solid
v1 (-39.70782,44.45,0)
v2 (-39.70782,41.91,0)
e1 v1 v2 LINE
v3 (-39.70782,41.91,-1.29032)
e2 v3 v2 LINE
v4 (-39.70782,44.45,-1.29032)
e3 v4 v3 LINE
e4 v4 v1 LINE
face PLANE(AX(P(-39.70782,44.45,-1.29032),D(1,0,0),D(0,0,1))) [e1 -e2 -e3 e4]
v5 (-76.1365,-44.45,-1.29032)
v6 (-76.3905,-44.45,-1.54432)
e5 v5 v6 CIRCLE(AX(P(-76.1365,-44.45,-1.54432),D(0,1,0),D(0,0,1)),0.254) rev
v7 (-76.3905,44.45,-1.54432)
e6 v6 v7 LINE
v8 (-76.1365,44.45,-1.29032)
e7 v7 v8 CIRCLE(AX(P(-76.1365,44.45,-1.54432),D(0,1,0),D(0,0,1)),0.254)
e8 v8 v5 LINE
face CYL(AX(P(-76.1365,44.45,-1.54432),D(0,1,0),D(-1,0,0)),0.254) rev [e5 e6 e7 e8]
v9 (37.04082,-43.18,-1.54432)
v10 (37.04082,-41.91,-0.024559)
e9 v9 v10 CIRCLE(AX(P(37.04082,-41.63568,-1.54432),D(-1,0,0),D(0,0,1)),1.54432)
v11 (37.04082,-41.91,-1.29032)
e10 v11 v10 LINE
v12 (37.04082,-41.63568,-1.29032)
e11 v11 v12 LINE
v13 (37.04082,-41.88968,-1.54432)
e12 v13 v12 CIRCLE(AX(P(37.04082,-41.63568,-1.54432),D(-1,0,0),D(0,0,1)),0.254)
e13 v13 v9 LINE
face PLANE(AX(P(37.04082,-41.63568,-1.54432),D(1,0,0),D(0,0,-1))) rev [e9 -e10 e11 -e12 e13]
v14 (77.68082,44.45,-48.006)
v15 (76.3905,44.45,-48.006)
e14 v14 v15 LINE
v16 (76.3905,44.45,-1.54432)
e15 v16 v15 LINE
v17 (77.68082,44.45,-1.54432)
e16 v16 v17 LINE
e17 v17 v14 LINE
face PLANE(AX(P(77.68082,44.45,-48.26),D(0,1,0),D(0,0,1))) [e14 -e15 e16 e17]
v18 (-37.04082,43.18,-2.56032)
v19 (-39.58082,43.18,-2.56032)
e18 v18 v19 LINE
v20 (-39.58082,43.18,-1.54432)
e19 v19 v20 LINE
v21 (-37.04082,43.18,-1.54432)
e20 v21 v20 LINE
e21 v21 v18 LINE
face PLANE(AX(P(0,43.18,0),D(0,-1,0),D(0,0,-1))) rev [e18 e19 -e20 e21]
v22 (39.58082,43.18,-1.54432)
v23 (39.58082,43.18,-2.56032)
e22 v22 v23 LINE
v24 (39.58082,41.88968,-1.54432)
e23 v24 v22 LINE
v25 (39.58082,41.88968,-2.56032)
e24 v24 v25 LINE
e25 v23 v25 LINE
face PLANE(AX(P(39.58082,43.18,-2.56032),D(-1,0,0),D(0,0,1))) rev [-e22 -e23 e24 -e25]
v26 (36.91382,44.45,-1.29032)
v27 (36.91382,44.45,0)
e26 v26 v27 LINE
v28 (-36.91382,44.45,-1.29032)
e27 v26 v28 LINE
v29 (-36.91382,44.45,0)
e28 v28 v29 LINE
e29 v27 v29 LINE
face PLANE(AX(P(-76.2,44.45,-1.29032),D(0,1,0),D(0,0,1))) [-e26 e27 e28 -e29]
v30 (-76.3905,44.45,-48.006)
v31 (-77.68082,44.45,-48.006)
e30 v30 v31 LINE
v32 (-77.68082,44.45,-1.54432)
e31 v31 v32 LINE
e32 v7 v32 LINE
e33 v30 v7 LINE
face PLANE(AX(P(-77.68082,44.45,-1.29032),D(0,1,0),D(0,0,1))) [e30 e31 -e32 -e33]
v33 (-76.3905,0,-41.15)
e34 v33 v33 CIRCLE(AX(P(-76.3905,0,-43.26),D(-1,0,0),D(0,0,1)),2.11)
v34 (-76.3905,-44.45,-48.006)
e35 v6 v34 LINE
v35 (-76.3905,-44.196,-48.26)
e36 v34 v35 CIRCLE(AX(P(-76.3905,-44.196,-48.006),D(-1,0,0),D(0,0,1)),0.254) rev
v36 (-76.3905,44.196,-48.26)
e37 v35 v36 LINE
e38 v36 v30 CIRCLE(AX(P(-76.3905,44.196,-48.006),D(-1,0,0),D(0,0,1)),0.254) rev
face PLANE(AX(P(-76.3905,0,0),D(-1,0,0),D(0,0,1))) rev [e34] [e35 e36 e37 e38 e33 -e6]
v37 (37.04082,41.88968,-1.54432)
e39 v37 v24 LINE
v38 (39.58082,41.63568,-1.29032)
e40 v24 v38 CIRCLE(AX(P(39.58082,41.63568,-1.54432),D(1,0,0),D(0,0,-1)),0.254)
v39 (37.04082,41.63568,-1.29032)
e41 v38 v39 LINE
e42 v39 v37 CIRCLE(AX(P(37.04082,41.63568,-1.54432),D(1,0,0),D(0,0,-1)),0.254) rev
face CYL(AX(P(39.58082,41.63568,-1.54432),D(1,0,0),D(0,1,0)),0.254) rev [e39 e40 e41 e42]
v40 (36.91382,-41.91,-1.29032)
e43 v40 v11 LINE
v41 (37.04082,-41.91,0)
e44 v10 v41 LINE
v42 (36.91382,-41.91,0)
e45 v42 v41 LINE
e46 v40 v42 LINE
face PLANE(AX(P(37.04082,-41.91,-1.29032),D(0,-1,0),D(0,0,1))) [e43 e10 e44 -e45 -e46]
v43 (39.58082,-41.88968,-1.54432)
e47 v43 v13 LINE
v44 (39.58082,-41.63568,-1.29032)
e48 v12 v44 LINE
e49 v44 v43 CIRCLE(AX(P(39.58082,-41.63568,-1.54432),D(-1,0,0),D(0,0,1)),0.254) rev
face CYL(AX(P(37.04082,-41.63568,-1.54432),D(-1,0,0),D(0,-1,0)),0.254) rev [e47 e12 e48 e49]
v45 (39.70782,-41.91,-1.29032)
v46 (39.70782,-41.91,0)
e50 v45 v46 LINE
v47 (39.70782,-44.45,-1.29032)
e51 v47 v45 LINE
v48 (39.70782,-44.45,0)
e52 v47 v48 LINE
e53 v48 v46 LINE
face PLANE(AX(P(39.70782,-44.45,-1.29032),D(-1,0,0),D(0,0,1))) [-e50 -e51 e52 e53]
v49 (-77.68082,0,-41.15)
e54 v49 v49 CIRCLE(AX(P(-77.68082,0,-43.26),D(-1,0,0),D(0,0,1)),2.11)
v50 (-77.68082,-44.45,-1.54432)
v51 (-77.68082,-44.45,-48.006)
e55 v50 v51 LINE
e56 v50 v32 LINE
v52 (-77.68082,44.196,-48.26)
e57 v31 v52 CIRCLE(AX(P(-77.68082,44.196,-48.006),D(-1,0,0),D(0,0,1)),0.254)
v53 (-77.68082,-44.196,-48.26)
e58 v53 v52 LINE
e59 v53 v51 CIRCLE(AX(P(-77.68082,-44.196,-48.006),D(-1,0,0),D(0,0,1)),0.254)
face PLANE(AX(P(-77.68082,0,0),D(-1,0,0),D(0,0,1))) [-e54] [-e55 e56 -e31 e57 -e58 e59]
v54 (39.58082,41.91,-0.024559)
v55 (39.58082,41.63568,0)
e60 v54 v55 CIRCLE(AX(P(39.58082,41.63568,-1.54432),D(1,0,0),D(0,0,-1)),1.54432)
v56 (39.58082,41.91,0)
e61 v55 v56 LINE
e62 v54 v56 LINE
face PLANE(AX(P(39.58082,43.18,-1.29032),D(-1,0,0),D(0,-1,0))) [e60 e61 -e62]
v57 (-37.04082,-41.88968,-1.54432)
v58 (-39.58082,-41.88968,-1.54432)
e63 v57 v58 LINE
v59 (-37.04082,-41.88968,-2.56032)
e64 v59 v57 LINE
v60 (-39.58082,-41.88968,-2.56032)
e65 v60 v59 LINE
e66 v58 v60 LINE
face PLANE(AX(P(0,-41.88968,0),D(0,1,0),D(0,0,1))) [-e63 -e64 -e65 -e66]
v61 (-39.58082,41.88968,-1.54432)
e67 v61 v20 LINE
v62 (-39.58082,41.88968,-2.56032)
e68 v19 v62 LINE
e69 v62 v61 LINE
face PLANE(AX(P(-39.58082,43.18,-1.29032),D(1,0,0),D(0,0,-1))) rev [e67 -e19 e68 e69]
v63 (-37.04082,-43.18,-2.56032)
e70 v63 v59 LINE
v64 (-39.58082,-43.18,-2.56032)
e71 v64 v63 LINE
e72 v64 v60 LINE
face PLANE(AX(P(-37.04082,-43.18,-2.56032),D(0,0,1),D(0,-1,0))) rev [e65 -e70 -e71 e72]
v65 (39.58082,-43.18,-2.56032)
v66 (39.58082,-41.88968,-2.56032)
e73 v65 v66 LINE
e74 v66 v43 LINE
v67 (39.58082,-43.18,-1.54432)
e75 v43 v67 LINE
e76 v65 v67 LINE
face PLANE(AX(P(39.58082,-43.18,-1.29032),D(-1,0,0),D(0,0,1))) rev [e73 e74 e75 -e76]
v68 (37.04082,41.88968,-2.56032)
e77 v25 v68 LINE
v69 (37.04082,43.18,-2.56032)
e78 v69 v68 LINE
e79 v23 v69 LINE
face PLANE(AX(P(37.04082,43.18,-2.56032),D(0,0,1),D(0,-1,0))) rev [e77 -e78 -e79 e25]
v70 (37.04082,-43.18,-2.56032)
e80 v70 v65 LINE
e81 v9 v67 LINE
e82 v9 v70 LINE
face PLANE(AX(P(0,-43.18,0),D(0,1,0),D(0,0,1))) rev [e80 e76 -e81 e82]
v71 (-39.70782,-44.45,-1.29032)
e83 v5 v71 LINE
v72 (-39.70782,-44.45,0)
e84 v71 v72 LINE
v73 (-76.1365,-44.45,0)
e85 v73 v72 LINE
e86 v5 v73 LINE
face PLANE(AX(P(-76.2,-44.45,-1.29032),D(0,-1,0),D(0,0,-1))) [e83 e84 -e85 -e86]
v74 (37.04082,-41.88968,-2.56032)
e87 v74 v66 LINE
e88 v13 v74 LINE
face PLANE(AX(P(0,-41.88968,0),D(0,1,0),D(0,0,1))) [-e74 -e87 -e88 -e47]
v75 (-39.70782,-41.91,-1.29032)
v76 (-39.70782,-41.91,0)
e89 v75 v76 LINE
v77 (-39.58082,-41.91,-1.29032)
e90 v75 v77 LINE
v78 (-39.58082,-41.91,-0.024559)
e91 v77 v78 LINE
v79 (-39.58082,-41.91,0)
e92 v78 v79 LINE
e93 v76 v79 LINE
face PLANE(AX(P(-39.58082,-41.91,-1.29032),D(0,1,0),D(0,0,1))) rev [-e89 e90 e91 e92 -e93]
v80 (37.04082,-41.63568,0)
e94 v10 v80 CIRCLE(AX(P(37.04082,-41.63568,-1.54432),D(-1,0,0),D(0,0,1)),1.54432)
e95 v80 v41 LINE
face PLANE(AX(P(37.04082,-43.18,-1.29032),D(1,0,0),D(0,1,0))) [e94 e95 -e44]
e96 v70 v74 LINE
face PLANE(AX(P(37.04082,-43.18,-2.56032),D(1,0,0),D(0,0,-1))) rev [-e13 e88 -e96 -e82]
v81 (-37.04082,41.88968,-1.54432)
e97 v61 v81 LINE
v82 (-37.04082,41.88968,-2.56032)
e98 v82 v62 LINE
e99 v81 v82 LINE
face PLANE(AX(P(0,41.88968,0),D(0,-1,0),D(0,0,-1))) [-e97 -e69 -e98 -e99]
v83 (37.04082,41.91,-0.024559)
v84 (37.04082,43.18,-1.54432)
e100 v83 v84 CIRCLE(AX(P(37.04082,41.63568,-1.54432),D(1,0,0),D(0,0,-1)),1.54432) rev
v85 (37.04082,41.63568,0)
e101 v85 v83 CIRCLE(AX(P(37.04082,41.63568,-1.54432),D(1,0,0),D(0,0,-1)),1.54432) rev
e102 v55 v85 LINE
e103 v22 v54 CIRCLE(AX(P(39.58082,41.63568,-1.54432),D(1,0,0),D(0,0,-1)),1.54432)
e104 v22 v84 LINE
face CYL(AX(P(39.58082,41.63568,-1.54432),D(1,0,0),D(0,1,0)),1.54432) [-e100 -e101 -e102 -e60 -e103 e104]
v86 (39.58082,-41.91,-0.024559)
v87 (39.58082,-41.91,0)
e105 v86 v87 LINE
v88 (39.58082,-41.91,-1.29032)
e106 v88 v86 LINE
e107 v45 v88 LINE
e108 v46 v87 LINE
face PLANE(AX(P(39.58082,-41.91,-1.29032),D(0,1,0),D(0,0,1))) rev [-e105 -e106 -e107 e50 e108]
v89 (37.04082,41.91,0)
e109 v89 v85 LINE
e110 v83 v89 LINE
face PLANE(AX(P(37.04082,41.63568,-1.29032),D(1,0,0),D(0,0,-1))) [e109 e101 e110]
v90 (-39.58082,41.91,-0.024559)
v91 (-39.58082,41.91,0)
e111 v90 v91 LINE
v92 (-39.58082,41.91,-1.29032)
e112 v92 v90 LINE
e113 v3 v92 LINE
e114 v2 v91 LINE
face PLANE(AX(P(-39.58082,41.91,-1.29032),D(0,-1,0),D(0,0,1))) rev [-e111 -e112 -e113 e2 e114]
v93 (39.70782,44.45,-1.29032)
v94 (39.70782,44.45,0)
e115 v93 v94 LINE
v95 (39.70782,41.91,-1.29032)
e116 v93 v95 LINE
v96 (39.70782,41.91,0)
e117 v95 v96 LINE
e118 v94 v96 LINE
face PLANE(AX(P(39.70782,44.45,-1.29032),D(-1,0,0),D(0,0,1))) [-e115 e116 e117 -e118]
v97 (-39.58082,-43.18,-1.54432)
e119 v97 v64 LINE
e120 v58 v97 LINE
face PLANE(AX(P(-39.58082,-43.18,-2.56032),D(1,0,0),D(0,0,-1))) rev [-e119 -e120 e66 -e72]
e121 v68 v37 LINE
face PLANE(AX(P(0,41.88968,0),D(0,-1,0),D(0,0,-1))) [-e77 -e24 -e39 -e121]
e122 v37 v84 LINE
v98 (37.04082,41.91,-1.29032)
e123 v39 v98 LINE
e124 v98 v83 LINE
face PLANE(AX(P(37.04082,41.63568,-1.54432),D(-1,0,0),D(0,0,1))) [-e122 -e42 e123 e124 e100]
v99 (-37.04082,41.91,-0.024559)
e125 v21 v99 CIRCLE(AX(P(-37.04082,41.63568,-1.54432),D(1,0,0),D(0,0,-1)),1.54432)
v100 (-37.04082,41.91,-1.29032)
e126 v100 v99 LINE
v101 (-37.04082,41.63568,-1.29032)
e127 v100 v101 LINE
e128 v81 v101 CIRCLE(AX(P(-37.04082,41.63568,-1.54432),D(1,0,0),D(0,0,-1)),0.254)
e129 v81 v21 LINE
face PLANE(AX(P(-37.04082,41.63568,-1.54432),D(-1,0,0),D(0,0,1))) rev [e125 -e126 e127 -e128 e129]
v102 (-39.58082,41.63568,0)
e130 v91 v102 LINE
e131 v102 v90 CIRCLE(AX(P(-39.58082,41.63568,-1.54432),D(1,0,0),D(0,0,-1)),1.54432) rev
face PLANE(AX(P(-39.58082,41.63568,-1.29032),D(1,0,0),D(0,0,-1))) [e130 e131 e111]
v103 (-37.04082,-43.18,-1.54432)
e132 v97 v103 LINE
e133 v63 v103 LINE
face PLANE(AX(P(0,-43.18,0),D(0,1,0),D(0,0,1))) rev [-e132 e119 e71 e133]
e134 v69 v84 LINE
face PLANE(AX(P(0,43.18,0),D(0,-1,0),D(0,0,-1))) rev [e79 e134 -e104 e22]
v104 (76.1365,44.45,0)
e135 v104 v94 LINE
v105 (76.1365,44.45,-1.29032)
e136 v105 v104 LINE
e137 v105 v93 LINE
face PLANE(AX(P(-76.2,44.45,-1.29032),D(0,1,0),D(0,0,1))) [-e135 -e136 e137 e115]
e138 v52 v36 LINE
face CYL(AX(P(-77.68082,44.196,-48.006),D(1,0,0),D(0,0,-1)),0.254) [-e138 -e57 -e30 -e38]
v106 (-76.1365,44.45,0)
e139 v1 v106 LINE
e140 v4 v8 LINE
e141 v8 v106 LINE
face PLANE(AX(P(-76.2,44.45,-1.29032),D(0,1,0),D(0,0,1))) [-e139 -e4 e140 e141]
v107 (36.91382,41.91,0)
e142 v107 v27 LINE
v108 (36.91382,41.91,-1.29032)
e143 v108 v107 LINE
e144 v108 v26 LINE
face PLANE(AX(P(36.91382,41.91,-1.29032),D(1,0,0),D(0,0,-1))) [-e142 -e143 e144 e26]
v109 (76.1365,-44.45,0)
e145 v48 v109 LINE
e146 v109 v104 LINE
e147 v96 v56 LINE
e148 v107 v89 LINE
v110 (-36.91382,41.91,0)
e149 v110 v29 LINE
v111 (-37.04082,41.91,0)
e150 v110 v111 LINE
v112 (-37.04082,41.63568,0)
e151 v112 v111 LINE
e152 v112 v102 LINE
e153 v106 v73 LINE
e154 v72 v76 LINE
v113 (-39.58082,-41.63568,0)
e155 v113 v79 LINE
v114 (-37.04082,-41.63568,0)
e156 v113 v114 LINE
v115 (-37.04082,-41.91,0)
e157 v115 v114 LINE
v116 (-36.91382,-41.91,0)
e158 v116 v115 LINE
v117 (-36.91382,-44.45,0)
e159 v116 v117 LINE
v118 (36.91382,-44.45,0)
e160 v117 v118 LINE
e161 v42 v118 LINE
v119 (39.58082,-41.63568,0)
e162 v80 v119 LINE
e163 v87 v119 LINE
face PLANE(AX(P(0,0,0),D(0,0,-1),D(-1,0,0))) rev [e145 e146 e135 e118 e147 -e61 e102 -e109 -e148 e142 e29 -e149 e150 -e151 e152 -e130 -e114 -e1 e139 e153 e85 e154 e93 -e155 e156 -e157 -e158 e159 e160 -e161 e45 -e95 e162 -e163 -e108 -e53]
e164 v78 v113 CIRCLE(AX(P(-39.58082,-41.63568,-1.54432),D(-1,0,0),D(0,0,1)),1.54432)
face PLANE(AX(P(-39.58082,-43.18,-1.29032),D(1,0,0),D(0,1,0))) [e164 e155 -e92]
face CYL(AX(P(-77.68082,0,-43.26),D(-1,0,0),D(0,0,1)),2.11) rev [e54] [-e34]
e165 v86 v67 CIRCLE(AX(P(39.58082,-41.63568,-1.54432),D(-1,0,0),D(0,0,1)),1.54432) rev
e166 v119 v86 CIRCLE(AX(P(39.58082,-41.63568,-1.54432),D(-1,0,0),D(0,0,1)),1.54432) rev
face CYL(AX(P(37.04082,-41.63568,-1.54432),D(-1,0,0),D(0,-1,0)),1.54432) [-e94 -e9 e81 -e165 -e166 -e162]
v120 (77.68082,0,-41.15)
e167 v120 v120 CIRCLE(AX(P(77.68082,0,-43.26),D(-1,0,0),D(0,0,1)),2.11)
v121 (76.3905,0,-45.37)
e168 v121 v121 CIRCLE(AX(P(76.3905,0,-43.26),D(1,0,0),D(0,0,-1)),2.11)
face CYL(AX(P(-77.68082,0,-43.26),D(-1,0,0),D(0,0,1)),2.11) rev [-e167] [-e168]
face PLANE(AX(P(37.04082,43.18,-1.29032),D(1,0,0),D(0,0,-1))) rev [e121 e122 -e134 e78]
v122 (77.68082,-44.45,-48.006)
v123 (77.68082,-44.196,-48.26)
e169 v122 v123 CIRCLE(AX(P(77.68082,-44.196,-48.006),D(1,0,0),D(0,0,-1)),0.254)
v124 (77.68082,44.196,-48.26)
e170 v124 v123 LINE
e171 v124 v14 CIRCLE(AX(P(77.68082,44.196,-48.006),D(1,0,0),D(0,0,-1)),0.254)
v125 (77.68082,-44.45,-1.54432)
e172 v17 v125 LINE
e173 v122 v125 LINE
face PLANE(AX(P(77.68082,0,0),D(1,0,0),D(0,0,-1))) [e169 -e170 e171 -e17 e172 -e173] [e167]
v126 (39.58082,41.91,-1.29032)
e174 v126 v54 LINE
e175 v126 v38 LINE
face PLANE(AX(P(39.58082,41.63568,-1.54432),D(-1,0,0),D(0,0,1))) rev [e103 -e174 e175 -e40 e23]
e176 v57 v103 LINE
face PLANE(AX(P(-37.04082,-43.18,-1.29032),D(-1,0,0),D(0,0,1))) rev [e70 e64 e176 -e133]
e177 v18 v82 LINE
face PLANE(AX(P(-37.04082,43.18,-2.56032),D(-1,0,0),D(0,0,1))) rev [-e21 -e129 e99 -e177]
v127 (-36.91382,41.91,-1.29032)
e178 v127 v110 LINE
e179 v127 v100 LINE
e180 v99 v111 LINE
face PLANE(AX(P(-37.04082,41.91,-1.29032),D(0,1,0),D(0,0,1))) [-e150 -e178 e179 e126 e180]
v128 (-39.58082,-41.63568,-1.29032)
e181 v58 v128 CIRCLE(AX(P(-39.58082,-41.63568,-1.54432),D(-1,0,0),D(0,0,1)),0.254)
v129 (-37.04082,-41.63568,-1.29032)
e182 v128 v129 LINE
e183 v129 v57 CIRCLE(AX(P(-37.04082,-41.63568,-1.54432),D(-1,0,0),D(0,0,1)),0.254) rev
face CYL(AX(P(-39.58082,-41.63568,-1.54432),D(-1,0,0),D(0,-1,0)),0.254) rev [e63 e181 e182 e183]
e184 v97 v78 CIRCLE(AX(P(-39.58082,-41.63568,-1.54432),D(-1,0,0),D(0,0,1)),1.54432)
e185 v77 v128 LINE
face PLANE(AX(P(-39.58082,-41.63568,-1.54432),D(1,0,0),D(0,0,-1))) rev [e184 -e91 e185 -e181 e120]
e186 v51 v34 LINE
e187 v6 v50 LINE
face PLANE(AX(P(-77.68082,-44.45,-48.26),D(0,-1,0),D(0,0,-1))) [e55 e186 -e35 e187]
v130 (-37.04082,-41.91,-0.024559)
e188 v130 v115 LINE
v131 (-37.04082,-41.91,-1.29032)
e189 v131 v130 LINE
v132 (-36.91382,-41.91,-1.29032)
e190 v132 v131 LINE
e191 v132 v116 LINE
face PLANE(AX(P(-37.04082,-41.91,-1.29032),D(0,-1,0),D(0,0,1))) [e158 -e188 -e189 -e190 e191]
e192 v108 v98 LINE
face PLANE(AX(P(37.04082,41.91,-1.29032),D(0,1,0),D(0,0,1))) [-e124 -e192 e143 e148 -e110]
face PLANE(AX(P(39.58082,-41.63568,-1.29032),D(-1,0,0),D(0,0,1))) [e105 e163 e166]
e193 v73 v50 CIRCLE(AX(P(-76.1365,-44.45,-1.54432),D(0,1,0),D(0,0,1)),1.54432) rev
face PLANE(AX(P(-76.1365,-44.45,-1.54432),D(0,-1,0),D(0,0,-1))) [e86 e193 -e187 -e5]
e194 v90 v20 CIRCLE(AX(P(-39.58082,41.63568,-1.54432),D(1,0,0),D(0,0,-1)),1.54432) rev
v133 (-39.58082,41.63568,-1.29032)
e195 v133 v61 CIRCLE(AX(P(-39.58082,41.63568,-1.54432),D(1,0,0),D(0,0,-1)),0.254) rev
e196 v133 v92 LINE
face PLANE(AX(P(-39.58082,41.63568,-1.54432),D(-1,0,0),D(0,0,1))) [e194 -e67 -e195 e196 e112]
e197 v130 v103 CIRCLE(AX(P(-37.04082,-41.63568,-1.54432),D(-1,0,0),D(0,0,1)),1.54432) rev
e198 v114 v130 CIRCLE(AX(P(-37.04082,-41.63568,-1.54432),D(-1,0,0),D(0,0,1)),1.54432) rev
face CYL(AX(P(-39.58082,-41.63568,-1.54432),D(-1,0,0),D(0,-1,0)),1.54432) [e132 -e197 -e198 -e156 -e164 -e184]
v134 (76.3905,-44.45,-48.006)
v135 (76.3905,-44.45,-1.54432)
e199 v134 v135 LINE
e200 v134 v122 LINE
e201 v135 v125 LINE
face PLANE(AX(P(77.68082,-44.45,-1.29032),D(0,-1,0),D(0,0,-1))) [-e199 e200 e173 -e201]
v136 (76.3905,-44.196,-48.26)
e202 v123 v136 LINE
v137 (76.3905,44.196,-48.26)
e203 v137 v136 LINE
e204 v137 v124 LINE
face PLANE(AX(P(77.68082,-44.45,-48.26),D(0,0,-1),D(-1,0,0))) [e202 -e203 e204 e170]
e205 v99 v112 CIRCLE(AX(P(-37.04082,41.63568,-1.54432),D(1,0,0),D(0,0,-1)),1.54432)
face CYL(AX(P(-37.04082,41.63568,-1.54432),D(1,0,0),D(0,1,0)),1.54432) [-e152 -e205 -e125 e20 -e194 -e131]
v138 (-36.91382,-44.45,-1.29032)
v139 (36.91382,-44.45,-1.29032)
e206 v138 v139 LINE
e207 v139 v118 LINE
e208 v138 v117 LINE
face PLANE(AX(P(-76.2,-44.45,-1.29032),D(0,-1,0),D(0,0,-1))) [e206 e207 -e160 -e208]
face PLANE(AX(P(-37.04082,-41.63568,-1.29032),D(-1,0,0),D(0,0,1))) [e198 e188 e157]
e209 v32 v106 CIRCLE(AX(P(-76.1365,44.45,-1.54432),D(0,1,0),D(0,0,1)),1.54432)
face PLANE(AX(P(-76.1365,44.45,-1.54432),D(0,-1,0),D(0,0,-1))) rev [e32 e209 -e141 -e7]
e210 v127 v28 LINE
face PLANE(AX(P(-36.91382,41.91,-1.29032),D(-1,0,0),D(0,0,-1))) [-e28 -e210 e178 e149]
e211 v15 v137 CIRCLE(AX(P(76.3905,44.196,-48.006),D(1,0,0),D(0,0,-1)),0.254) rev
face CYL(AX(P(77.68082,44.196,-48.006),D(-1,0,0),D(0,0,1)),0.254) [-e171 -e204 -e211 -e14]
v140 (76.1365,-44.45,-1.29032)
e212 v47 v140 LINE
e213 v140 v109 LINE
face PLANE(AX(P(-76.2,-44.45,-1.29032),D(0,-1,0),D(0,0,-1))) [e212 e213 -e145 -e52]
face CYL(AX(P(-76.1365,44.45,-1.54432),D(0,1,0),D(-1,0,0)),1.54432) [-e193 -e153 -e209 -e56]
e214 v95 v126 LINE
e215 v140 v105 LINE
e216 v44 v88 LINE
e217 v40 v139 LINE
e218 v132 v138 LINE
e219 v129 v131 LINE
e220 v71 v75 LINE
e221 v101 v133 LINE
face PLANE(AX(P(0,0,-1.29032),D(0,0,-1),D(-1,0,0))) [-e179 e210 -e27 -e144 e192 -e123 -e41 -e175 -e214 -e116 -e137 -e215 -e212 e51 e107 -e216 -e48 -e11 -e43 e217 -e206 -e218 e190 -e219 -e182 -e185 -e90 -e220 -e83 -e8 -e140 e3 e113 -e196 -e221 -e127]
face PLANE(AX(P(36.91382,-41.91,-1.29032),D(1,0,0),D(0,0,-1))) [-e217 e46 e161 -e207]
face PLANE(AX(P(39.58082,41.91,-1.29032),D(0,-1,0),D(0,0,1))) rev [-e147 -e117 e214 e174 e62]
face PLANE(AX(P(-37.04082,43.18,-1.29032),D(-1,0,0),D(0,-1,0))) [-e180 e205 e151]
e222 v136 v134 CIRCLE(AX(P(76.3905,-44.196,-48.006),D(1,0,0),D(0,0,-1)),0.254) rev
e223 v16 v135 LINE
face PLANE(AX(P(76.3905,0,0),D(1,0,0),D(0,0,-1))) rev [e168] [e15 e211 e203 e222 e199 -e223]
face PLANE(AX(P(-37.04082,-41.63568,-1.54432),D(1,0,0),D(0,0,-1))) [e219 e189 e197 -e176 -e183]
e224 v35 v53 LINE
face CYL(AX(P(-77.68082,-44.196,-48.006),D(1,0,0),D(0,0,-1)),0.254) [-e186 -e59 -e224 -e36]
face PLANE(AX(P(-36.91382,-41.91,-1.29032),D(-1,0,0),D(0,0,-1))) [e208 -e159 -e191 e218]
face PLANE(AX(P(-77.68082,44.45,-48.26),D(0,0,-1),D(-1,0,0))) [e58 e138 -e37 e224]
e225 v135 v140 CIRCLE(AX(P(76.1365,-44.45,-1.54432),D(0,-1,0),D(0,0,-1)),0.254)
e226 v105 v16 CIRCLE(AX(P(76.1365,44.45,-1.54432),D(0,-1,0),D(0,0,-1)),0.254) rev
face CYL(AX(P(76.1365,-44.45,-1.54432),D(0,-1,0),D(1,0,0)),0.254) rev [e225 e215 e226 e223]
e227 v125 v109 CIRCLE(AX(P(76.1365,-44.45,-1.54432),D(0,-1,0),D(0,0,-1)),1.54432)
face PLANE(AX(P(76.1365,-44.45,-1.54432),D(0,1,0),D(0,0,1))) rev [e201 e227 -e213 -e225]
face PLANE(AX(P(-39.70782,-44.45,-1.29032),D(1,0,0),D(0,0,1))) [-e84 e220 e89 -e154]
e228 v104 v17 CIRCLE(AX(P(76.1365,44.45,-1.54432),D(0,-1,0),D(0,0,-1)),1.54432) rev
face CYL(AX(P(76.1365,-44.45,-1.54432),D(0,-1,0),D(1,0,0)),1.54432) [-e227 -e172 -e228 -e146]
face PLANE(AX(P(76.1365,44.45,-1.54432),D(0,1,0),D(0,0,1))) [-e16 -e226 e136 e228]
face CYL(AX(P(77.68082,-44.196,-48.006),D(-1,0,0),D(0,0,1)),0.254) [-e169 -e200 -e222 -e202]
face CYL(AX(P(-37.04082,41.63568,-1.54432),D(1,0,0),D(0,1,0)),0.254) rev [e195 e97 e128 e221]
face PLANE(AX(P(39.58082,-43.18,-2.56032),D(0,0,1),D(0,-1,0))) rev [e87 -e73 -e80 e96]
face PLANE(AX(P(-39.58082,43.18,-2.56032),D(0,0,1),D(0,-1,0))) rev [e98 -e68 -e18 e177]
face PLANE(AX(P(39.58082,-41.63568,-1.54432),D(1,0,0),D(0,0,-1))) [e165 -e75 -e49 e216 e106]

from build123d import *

# Parameters (mm, degrees)
SKETCH1_W                         = 152.4
SKETCH1_H                         = 88.9
BASE_FLANGE1_DEPTH                = 1.29032
EDGE_FLANGE1_STRIP_W              = 5.85978
EDGE_FLANGE1_STRIP_H              = 1.29032
EDGE_FLANGE1_STRIP_CUT_DEPTH      = 88.9
EDGE_FLANGE1_STRIP_2_W            = 5.85978
EDGE_FLANGE1_STRIP_2_H            = 1.29032
EDGE_FLANGE1_STRIP_CUT_2_DEPTH    = 88.9
EDGE_FLANGE1_DEPTH                = 88.9
EDGE_FLANGE1_BEND_DEPTH           = 88.9
F_4_22MM_HOLE_FOR_M3_CLINCH_NUT_D = 4.22
BREAK_CORNER1_START               = -77.68082
BREAK_CORNER1_DEPTH               = 155.36164
CUT_THICKEN1_START                = 41.91
CUT_THICKEN1_OUTLINE_W            = 0.127
CUT_THICKEN1_OUTLINE_H            = 1.29032
CUT_THICKEN1_DEPTH                = 2.54
CUT_THICKEN2_START                = 41.91
CUT_THICKEN2_OUTLINE_W            = 0.127
CUT_THICKEN2_OUTLINE_H            = 1.29032
CUT_THICKEN2_DEPTH                = 2.54
MIRROR7_START                     = 41.91
MIRROR7_COPY_1_SKETCH_W           = 0.127
MIRROR7_COPY_1_SKETCH_H           = 1.29032
MIRROR7_COPY_1_DEPTH              = 2.54
MIRROR7_COPY_2_SKETCH_W           = 0.127
MIRROR7_COPY_2_SKETCH_H           = 1.29032
MIRROR7_COPY_2_DEPTH              = 2.54
MOVE_FACE1_BY                     = 1.27
MOVE_FACE1_2_BY                   = 1.27
MOVE_FACE1_3_BY                   = 1.27
MOVE_FACE1_4_BY                   = 1.27
EDGE_FLANGE2_STRIP_W              = 5.66928
EDGE_FLANGE2_STRIP_H              = 1.29032
EDGE_FLANGE2_STRIP_CUT_DEPTH      = 2.54
EDGE_FLANGE2_STRIP_2_W            = 5.66928
EDGE_FLANGE2_STRIP_2_H            = 1.29032
EDGE_FLANGE2_STRIP_CUT_2_DEPTH    = 2.54
EDGE_FLANGE2_STRIP_3_W            = 5.66928
EDGE_FLANGE2_STRIP_3_H            = 1.29032
EDGE_FLANGE2_STRIP_CUT_3_DEPTH    = 2.54
EDGE_FLANGE2_STRIP_4_W            = 5.66928
EDGE_FLANGE2_STRIP_4_H            = 1.29032
EDGE_FLANGE2_STRIP_CUT_4_DEPTH    = 2.54
EDGE_FLANGE2_DEPTH                = 2.54
EDGE_FLANGE2_BEND_DEPTH           = 2.54
EDGE_FLANGE2_BEND_2_DEPTH         = 2.54
EDGE_FLANGE2_BEND_3_DEPTH         = 2.54


# Read off the part's stored shape, not the designer's step: Break-Corner1, Cut-Thicken1, Cut-Thicken2
# Sheet-metal steps are written as plain solids
with BuildPart() as part:
    # Sketch1 → Base-Flange1 (new body)
    with BuildSketch(Plane.XY):
        Rectangle(SKETCH1_W, SKETCH1_H)
    extrude(amount=-BASE_FLANGE1_DEPTH)

    # Edge-Flange1 strip (across the edge) → Edge-Flange1 strip cut (cut)
    with BuildSketch(Plane(origin=(-76.3905, -44.45, -1.29032), x_dir=(1, 0, 0), z_dir=(0, 1, 0))):
        with Locations((-2.67589, -0.64516)):
            Rectangle(EDGE_FLANGE1_STRIP_W, EDGE_FLANGE1_STRIP_H)
    extrude(amount=EDGE_FLANGE1_STRIP_CUT_DEPTH, mode=Mode.SUBTRACT)

    # Edge-Flange1 strip 2 (across the edge) → Edge-Flange1 strip cut 2 (cut)
    with BuildSketch(Plane(origin=(76.3905, 44.45, -1.29032), x_dir=(-1, 0, 0), z_dir=(0, -1, 0))):
        with Locations((-2.67589, -0.64516)):
            Rectangle(EDGE_FLANGE1_STRIP_2_W, EDGE_FLANGE1_STRIP_2_H)
    extrude(amount=EDGE_FLANGE1_STRIP_CUT_2_DEPTH, mode=Mode.SUBTRACT)

    # Edge-Flange1 section (across the edge) → Edge-Flange1 (add)
    with BuildSketch(Plane(origin=(-76.3905, -44.45, -1.29032), x_dir=(1, 0, 0), z_dir=(0, 1, 0))):
        with BuildLine():
            Line((-1.29032, 0.254), (-1.29032, 46.96968))
            Line((-1.29032, 46.96968), (0, 46.96968))
            Line((0, 46.96968), (0, 0.254))
            ThreePointArc((0, 0.254), (0.074394878, 0.074394878), (0.254, 0))
            Line((0.254, 0), (0.254, -1.29032))
            ThreePointArc((0.254, -1.29032), (-0.837999144, -0.837999144), (-1.29032, 0.254))
        make_face()
    extrude(amount=EDGE_FLANGE1_DEPTH)

    # Edge-Flange1 section 2 (across the edge) → Edge-Flange1 bend (add)
    with BuildSketch(Plane(origin=(76.3905, 44.45, -1.29032), x_dir=(-1, 0, 0), z_dir=(0, -1, 0))):
        with BuildLine():
            Line((-1.29032, 0.254), (-1.29032, 46.96968))
            Line((-1.29032, 46.96968), (0, 46.96968))
            Line((0, 46.96968), (0, 0.254))
            ThreePointArc((0, 0.254), (0.074394878, 0.074394878), (0.254, 0))
            Line((0.254, 0), (0.254, -1.29032))
            ThreePointArc((0.254, -1.29032), (-0.837999144, -0.837999144), (-1.29032, 0.254))
        make_face()
    extrude(amount=EDGE_FLANGE1_BEND_DEPTH)

    # Ø4.22mm hole for M3 Clinch nut (through all)
    with Locations(Plane.ZY.offset(77.68082)):
        with Locations((-43.26, 0)):
            f_4_22mm_hole_for_m3_clinch_nut = Hole(F_4_22MM_HOLE_FOR_M3_CLINCH_NUT_D / 2)

    # Mirror1: Ø4.22mm hole for M3 Clinch nut across plane
    add(f_4_22mm_hole_for_m3_clinch_nut.mirror(Plane(origin=(0, 0, 0), x_dir=(0, 0, 1), z_dir=(1, 0, 0))), mode=Mode.SUBTRACT)

    # Break-Corner1 outline → Break-Corner1 (cut)
    with BuildSketch(Plane.YZ.offset(BREAK_CORNER1_START)):
        with BuildLine():
            Line((44.45, -48.26), (44.45, -48.006))
            ThreePointArc((44.45, -48.006), (44.375605122, -48.185605122), (44.196, -48.26))
            Line((44.196, -48.26), (44.45, -48.26))
        make_face()
        with BuildLine():
            Line((-44.45, -48.26), (-44.196, -48.26))
            ThreePointArc((-44.196, -48.26), (-44.375605122, -48.185605122), (-44.45, -48.006))
            Line((-44.45, -48.006), (-44.45, -48.26))
        make_face()
    extrude(amount=BREAK_CORNER1_DEPTH, mode=Mode.SUBTRACT)

    # Cut-Thicken1 outline → Cut-Thicken1 (cut)
    with BuildSketch(Plane(origin=(0, 0, 0), x_dir=(1, 0, 0), z_dir=(0, 1, 0)).offset(CUT_THICKEN1_START)):
        with Locations((36.97732, 0.64516)):
            Rectangle(CUT_THICKEN1_OUTLINE_W, CUT_THICKEN1_OUTLINE_H)
    cut_thicken1 = extrude(amount=CUT_THICKEN1_DEPTH, mode=Mode.SUBTRACT)

    # Cut-Thicken2 outline → Cut-Thicken2 (cut)
    with BuildSketch(Plane(origin=(0, 0, 0), x_dir=(1, 0, 0), z_dir=(0, 1, 0)).offset(CUT_THICKEN2_START)):
        with Locations((39.64432, 0.64516)):
            Rectangle(CUT_THICKEN2_OUTLINE_W, CUT_THICKEN2_OUTLINE_H)
    cut_thicken2 = extrude(amount=CUT_THICKEN2_DEPTH, mode=Mode.SUBTRACT)

    # Mirror6: Cut-Thicken1, Cut-Thicken2 across plane
    add(cut_thicken1.mirror(Plane(origin=(0, 0, 0), x_dir=(0, 0, 1), z_dir=(1, 0, 0))), mode=Mode.SUBTRACT)
    add(cut_thicken2.mirror(Plane(origin=(0, 0, 0), x_dir=(0, 0, 1), z_dir=(1, 0, 0))), mode=Mode.SUBTRACT)

    # Mirror7: Cut-Thicken1, Cut-Thicken2 across plane
    add(cut_thicken1.mirror(Plane.ZX), mode=Mode.SUBTRACT)
    add(cut_thicken2.mirror(Plane.ZX), mode=Mode.SUBTRACT)

    # Mirror7 copy 1 sketch → Mirror7 copy 1 (cut)
    with BuildSketch(Plane(origin=(0, 0, 0), x_dir=(-1, 0, 0), z_dir=(0, -1, 0)).offset(MIRROR7_START)):
        with Locations((36.97732, 0.64516)):
            Rectangle(MIRROR7_COPY_1_SKETCH_W, MIRROR7_COPY_1_SKETCH_H)
    extrude(amount=MIRROR7_COPY_1_DEPTH, mode=Mode.SUBTRACT)

    # Mirror7 copy 2 sketch → Mirror7 copy 2 (cut)
    with BuildSketch(Plane(origin=(0, 0, 0), x_dir=(-1, 0, 0), z_dir=(0, -1, 0)).offset(MIRROR7_START)):
        with Locations((39.64432, 0.64516)):
            Rectangle(MIRROR7_COPY_2_SKETCH_W, MIRROR7_COPY_2_SKETCH_H)
    extrude(amount=MIRROR7_COPY_2_DEPTH, mode=Mode.SUBTRACT)

    # Move Face1: a face moved inward by 1.27
    extrude(part.faces().sort_by_distance((-38.31082, -44.45, -0.64516))[0], amount=MOVE_FACE1_BY, dir=(0, 1, 0), mode=Mode.SUBTRACT)

    # Move Face1 2: a face moved inward by 1.27
    extrude(part.faces().sort_by_distance((38.31082, -44.45, -0.64516))[0], amount=MOVE_FACE1_2_BY, dir=(0, 1, 0), mode=Mode.SUBTRACT)

    # Move Face1 3: a face moved inward by 1.27
    extrude(part.faces().sort_by_distance((-38.31082, 44.45, -0.64516))[0], amount=MOVE_FACE1_3_BY, dir=(0, -1, 0), mode=Mode.SUBTRACT)

    # Move Face1 4: a face moved inward by 1.27
    extrude(part.faces().sort_by_distance((38.31082, 44.45, -0.64516))[0], amount=MOVE_FACE1_4_BY, dir=(0, -1, 0), mode=Mode.SUBTRACT)

    # Edge-Flange2 strip (across the edge) → Edge-Flange2 strip cut (cut)
    with BuildSketch(Plane(origin=(37.04082, 43.18, -1.29032), x_dir=(0, -1, 0), z_dir=(1, 0, 0))):
        with Locations((-1.29032, -0.64516)):
            Rectangle(EDGE_FLANGE2_STRIP_W, EDGE_FLANGE2_STRIP_H)
    extrude(amount=EDGE_FLANGE2_STRIP_CUT_DEPTH, mode=Mode.SUBTRACT)

    # Edge-Flange2 strip 2 (across the edge) → Edge-Flange2 strip cut 2 (cut)
    with BuildSketch(Plane(origin=(-39.58082, 43.18, -1.29032), x_dir=(0, -1, 0), z_dir=(1, 0, 0))):
        with Locations((-1.29032, -0.64516)):
            Rectangle(EDGE_FLANGE2_STRIP_2_W, EDGE_FLANGE2_STRIP_2_H)
    extrude(amount=EDGE_FLANGE2_STRIP_CUT_2_DEPTH, mode=Mode.SUBTRACT)

    # Edge-Flange2 strip 3 (across the edge) → Edge-Flange2 strip cut 3 (cut)
    with BuildSketch(Plane(origin=(39.58082, -43.18, -1.29032), x_dir=(0, 1, 0), z_dir=(-1, 0, 0))):
        with Locations((-1.29032, -0.64516)):
            Rectangle(EDGE_FLANGE2_STRIP_3_W, EDGE_FLANGE2_STRIP_3_H)
    extrude(amount=EDGE_FLANGE2_STRIP_CUT_3_DEPTH, mode=Mode.SUBTRACT)

    # Edge-Flange2 strip 4 (across the edge) → Edge-Flange2 strip cut 4 (cut)
    with BuildSketch(Plane(origin=(-37.04082, -43.18, -1.29032), x_dir=(0, 1, 0), z_dir=(-1, 0, 0))):
        with Locations((-1.29032, -0.64516)):
            Rectangle(EDGE_FLANGE2_STRIP_4_W, EDGE_FLANGE2_STRIP_4_H)
    extrude(amount=EDGE_FLANGE2_STRIP_CUT_4_DEPTH, mode=Mode.SUBTRACT)

    # Edge-Flange2 section (across the edge) → Edge-Flange2 (add)
    with BuildSketch(Plane(origin=(37.04082, 43.18, -1.29032), x_dir=(0, -1, 0), z_dir=(1, 0, 0))):
        with BuildLine():
            Line((0, 0.254), (0, 1.27))
            Line((0, 1.27), (1.29032, 1.27))
            Line((1.29032, 1.27), (1.29032, 0.254))
            ThreePointArc((1.29032, 0.254), (1.364714878, 0.074394878), (1.54432, 0))
            Line((1.54432, 0), (1.54432, -1.29032))
            ThreePointArc((1.54432, -1.29032), (0.452320856, -0.837999144), (0, 0.254))
        make_face()
    extrude(amount=EDGE_FLANGE2_DEPTH)

    # Edge-Flange2 section 2 (across the edge) → Edge-Flange2 bend (add)
    with BuildSketch(Plane(origin=(-39.58082, 43.18, -1.29032), x_dir=(0, -1, 0), z_dir=(1, 0, 0))):
        with BuildLine():
            Line((0, 0.254), (0, 1.27))
            Line((0, 1.27), (1.29032, 1.27))
            Line((1.29032, 1.27), (1.29032, 0.254))
            ThreePointArc((1.29032, 0.254), (1.364714878, 0.074394878), (1.54432, 0))
            Line((1.54432, 0), (1.54432, -1.29032))
            ThreePointArc((1.54432, -1.29032), (0.452320856, -0.837999144), (0, 0.254))
        make_face()
    extrude(amount=EDGE_FLANGE2_BEND_DEPTH)

    # Edge-Flange2 section 3 (across the edge) → Edge-Flange2 bend 2 (add)
    with BuildSketch(Plane(origin=(39.58082, -43.18, -1.29032), x_dir=(0, 1, 0), z_dir=(-1, 0, 0))):
        with BuildLine():
            Line((0, 0.254), (0, 1.27))
            Line((0, 1.27), (1.29032, 1.27))
            Line((1.29032, 1.27), (1.29032, 0.254))
            ThreePointArc((1.29032, 0.254), (1.364714878, 0.074394878), (1.54432, 0))
            Line((1.54432, 0), (1.54432, -1.29032))
            ThreePointArc((1.54432, -1.29032), (0.452320856, -0.837999144), (0, 0.254))
        make_face()
    extrude(amount=EDGE_FLANGE2_BEND_2_DEPTH)

    # Edge-Flange2 section 4 (across the edge) → Edge-Flange2 bend 3 (add)
    with BuildSketch(Plane(origin=(-37.04082, -43.18, -1.29032), x_dir=(0, 1, 0), z_dir=(-1, 0, 0))):
        with BuildLine():
            Line((0, 0.254), (0, 1.27))
            Line((0, 1.27), (1.29032, 1.27))
            Line((1.29032, 1.27), (1.29032, 0.254))
            ThreePointArc((1.29032, 0.254), (1.364714878, 0.074394878), (1.54432, 0))
            Line((1.54432, 0), (1.54432, -1.29032))
            ThreePointArc((1.54432, -1.29032), (0.452320856, -0.837999144), (0, 0.254))
        make_face()
    extrude(amount=EDGE_FLANGE2_BEND_3_DEPTH)


solid = part.part
